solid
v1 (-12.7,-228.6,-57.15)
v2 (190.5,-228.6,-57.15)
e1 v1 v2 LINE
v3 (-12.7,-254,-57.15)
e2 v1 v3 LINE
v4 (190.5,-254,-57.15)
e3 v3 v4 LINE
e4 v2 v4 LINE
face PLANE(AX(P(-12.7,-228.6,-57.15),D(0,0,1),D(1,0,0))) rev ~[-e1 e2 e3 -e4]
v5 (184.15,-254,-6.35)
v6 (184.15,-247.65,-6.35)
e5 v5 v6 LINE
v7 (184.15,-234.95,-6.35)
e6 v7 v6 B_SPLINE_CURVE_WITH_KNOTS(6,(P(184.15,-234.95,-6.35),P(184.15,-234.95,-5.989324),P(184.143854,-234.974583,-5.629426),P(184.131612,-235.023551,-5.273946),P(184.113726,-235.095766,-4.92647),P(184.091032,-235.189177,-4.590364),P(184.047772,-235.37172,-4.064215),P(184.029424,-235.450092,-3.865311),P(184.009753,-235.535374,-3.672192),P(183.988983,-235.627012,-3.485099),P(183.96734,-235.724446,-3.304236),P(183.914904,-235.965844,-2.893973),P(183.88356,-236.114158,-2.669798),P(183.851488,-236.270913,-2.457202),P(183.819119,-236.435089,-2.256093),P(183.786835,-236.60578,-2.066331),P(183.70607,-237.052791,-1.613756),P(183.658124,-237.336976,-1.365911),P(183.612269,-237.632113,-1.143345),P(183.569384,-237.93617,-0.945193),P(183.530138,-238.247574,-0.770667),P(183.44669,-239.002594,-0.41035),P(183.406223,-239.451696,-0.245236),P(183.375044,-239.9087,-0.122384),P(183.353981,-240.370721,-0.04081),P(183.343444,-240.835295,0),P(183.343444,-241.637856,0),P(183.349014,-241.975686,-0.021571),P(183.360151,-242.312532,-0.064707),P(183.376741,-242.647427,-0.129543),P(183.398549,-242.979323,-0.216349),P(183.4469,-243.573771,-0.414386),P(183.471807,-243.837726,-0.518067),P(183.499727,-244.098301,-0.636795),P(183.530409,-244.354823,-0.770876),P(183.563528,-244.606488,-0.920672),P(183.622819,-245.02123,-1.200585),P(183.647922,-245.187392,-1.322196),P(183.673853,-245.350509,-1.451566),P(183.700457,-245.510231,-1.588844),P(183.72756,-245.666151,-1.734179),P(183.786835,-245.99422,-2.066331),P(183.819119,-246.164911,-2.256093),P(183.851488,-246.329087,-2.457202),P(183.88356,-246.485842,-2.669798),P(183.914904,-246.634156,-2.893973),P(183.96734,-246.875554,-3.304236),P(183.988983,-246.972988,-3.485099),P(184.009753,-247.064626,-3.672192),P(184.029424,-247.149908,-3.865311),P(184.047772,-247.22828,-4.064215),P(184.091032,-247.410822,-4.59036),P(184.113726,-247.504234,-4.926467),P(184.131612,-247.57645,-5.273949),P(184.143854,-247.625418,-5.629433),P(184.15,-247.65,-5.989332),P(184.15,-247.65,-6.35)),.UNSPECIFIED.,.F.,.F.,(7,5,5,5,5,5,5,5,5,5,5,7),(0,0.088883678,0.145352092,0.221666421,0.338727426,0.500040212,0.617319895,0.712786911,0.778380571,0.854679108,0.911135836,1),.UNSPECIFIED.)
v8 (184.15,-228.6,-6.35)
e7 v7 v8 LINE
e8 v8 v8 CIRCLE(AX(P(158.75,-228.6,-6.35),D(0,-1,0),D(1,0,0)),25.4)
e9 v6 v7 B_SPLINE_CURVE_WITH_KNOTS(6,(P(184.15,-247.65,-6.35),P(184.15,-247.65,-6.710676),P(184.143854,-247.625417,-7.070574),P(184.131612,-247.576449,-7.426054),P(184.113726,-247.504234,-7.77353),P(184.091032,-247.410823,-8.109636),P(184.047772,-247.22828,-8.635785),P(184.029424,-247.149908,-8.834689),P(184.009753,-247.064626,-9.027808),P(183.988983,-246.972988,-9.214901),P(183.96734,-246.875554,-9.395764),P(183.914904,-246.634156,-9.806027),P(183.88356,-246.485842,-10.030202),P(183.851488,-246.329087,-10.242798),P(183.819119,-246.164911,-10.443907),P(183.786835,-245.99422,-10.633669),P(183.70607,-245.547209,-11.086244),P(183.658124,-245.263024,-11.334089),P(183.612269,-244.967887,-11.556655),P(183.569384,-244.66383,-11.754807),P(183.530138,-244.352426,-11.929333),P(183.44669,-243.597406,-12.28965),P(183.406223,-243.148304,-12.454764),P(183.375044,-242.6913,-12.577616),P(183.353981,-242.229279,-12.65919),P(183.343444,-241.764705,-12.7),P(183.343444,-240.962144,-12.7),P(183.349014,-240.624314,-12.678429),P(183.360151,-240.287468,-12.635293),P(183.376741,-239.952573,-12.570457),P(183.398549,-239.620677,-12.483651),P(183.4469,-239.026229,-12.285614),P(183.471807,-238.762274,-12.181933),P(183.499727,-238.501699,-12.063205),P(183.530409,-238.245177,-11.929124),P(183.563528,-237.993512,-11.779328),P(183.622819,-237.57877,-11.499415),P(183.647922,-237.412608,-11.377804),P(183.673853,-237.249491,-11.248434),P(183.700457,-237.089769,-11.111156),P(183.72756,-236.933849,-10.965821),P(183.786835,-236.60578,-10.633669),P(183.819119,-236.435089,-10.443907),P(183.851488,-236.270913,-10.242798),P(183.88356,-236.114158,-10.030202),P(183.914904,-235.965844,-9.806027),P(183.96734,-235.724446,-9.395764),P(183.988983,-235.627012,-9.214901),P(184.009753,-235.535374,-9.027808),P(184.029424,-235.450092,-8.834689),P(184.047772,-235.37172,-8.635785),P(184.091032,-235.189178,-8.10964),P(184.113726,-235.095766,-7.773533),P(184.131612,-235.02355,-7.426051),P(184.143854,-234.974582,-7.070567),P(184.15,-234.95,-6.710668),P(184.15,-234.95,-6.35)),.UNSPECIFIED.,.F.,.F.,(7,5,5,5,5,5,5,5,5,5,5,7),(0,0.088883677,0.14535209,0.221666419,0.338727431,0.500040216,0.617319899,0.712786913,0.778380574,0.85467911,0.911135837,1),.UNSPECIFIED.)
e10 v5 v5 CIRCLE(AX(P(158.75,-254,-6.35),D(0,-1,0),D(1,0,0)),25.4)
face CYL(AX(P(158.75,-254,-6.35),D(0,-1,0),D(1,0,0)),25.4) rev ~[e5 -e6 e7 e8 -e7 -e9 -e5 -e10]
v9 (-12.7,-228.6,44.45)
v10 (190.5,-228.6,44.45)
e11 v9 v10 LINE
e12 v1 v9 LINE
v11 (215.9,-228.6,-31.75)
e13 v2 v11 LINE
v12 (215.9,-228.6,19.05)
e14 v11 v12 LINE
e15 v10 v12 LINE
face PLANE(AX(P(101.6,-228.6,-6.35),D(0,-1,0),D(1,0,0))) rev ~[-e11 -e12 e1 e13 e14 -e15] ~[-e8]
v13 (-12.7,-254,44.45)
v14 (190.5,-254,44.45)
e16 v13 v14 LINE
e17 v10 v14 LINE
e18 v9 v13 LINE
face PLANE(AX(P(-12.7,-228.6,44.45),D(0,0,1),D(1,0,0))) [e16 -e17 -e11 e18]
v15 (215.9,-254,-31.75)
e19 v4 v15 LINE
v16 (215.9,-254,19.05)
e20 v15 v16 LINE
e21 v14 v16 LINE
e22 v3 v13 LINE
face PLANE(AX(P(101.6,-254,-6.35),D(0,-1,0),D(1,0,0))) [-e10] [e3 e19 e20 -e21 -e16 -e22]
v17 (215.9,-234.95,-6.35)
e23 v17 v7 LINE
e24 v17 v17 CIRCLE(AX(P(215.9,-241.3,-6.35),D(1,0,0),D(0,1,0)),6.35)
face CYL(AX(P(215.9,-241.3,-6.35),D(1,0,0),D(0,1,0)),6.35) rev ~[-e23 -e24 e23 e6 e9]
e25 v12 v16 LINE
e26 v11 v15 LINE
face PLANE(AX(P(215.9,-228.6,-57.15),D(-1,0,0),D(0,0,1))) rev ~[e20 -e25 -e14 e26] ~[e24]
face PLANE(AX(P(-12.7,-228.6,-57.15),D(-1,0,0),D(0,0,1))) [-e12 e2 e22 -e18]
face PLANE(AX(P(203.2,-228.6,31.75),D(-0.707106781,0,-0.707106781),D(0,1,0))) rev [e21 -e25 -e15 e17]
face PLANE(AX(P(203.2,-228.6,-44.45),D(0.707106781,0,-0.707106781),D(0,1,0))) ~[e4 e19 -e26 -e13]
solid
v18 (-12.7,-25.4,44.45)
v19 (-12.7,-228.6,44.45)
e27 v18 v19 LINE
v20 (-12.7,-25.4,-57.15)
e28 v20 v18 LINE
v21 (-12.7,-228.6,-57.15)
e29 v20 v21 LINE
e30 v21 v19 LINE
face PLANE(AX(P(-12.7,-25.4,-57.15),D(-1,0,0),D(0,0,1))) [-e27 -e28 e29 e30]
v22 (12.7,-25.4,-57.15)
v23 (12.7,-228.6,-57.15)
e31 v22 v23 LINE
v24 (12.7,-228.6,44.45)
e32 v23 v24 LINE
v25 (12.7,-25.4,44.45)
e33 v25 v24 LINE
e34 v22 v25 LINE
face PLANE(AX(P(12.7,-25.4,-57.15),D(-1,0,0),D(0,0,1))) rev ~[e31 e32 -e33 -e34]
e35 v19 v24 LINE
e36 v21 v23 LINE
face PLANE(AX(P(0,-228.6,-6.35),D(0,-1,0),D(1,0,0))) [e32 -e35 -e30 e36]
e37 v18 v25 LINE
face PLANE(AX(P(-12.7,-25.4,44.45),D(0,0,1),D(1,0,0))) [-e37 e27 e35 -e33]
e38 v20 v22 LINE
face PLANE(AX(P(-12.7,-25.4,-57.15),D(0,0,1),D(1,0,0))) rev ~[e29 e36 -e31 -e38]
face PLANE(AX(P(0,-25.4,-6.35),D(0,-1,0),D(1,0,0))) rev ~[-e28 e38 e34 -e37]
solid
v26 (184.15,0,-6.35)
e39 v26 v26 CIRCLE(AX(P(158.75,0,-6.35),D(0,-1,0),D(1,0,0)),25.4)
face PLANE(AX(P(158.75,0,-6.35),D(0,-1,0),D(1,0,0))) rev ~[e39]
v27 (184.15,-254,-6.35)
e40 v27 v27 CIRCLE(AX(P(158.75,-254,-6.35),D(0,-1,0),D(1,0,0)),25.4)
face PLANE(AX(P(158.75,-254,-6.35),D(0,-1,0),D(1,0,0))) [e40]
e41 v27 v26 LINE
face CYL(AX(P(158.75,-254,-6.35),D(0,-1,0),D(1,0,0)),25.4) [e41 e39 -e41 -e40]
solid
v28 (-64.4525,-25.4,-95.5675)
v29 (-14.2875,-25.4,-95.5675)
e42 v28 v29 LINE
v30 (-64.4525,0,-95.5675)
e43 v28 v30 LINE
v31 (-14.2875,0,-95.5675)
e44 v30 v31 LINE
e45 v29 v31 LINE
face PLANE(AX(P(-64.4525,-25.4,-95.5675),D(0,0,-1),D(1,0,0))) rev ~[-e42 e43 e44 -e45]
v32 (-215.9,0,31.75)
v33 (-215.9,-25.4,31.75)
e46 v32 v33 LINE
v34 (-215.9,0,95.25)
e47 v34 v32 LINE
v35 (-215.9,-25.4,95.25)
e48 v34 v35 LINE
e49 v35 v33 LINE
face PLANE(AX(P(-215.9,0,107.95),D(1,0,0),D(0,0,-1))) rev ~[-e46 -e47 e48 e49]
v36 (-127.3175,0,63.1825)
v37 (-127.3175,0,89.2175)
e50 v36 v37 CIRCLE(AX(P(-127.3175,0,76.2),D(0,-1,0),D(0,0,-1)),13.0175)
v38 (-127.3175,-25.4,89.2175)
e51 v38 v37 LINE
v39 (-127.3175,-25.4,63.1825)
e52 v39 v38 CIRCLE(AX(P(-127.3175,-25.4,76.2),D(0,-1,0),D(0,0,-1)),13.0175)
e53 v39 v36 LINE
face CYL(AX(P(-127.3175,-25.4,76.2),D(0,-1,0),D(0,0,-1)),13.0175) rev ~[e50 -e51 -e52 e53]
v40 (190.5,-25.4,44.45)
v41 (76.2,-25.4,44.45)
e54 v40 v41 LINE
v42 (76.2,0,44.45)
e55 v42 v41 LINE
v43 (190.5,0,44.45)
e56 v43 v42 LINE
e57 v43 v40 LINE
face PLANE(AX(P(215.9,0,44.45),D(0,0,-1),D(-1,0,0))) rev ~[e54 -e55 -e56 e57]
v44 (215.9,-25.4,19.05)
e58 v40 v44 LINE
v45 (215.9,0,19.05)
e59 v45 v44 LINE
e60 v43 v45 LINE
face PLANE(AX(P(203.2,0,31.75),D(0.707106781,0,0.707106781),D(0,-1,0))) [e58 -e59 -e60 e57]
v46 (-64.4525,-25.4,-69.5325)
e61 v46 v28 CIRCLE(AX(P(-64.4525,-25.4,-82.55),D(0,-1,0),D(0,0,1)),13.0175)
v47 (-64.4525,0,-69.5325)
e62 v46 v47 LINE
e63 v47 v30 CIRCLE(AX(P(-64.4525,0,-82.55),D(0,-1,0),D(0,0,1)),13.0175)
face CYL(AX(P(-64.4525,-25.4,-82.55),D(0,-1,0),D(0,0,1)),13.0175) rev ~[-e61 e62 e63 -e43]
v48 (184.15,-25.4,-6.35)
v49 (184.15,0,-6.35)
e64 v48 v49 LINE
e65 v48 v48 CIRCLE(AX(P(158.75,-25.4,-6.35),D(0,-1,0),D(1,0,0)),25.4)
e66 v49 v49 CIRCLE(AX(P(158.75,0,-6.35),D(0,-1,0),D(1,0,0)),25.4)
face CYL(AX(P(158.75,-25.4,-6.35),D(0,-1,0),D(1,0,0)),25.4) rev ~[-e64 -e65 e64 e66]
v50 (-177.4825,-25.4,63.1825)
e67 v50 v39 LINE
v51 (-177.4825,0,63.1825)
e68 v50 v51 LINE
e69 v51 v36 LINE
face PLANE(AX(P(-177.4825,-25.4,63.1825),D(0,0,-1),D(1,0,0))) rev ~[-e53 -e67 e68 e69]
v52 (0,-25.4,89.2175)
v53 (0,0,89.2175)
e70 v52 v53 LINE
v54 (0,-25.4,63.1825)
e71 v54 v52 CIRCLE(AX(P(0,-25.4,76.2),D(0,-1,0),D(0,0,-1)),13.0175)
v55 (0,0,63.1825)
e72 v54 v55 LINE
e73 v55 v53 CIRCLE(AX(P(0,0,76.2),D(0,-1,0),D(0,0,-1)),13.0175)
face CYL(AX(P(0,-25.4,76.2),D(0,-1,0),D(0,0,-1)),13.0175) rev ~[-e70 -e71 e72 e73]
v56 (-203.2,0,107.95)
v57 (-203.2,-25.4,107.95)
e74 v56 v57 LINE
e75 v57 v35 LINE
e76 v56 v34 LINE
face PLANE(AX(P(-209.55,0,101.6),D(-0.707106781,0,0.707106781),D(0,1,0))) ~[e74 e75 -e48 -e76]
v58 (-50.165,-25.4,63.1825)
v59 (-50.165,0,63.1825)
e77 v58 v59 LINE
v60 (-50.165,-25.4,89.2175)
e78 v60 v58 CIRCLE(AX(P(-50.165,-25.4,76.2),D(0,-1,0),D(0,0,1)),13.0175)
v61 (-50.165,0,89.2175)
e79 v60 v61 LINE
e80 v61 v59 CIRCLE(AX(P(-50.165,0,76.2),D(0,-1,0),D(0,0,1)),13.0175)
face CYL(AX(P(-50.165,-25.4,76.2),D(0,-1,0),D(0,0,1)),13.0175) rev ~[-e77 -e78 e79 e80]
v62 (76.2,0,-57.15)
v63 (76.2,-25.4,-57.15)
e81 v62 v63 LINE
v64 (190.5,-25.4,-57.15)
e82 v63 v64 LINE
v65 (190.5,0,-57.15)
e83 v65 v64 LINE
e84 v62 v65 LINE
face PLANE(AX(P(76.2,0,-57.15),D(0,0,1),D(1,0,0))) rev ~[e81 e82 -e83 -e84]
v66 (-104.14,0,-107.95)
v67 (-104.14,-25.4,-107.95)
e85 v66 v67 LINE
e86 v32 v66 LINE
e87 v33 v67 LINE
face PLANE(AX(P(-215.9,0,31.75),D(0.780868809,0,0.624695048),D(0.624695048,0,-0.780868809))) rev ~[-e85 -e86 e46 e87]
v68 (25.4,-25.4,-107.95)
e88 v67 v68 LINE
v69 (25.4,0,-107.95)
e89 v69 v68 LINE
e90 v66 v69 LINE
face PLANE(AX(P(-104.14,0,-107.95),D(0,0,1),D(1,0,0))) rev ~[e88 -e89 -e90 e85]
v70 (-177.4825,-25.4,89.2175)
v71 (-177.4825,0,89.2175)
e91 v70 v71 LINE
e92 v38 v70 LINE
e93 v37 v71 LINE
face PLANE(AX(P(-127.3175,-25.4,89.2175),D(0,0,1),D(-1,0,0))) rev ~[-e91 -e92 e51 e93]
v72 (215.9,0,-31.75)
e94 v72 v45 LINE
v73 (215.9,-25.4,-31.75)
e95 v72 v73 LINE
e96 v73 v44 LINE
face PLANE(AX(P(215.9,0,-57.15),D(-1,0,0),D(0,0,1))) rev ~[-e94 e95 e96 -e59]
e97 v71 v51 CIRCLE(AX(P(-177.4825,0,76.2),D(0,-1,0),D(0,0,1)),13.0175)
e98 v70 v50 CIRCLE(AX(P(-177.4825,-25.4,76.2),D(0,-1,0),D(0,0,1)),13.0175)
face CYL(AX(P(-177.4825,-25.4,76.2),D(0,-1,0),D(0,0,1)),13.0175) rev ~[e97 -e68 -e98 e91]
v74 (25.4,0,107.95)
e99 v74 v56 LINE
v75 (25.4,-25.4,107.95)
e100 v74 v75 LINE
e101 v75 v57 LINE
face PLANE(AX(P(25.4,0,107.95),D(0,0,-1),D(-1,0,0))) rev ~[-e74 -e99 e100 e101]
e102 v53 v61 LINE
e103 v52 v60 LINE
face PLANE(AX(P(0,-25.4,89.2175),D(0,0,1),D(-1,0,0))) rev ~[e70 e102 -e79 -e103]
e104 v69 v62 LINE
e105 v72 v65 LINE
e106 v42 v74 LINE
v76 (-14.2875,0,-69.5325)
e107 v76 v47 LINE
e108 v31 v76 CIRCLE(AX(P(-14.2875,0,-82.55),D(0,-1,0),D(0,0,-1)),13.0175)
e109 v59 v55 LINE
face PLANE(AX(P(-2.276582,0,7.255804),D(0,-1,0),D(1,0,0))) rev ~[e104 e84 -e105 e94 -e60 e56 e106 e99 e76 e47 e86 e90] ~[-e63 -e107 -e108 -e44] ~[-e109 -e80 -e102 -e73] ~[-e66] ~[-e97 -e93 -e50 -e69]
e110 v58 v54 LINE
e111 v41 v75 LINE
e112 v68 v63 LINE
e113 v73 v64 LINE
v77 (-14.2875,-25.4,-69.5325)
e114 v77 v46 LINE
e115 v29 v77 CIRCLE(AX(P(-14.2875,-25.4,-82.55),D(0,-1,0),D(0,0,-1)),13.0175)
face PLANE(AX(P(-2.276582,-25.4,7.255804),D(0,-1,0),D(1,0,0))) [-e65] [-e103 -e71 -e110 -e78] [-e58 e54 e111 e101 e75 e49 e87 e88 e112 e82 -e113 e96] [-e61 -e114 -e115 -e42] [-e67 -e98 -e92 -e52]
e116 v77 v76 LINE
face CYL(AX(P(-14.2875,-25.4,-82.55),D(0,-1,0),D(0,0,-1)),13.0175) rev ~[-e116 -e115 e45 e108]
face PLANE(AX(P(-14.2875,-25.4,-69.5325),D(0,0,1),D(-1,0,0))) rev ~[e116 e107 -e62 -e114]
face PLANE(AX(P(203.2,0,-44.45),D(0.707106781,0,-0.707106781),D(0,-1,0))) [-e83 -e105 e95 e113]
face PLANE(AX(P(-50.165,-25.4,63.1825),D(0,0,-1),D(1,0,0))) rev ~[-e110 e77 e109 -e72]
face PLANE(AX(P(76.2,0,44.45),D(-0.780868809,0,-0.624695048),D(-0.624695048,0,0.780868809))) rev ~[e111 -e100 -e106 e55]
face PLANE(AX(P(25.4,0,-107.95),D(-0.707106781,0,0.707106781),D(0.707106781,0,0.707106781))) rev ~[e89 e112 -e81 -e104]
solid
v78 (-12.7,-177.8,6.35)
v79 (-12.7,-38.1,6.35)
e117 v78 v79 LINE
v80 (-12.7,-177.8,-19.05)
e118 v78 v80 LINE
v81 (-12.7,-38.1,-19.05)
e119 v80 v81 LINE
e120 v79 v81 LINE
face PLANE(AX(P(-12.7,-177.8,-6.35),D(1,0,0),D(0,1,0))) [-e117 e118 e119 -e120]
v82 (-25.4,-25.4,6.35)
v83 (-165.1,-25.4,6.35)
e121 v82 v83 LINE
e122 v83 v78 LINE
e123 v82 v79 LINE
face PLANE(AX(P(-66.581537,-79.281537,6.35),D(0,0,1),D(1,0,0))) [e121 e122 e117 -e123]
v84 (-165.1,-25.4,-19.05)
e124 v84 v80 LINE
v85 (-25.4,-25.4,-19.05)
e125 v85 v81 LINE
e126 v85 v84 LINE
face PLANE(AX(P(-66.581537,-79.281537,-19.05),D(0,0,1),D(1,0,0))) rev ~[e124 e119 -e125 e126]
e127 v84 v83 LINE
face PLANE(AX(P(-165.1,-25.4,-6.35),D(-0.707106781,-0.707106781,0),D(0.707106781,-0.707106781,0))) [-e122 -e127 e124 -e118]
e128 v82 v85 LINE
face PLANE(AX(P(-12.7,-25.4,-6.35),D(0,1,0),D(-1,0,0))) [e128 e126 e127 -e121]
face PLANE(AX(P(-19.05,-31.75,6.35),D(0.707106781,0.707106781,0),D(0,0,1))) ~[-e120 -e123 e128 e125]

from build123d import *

# Parameters (mm, degrees)
F1_DEPTH   = 25.4
F2_R       = 25.4
F3_DEPTH   = 25.4
F4_W       = 25.4
F4_H       = 101.6
F5_DEPTH   = 203.2
F6_W       = 228.6
F6_H       = 101.6
F7_DEPTH   = 25.4
F8_R       = 25.4
F9_DEPTH   = 25.4
F12_DEPTH  = 12.7
F13_SIZE   = 12.7
F14_SIZE   = 25.4
F14_2_SIZE = 25.4
F15_SIZE   = 12.7
F16_DEPTH  = 254
F17_R      = 6.35
F18_DEPTH  = 32.5575558516
F20_DEPTH  = 25.4


with BuildPart() as f1:
    # F0 (on Front) → F1 (new body)
    with BuildSketch(Plane.XZ):
        Polygon((25.4, 107.95), (-215.9, 107.95), (-215.9, 31.75), (-104.14, -107.95), (25.4, -107.95), (76.2, -57.15), (215.9, -57.15), (215.9, 44.45), (76.2, 44.45), align=None)
    extrude(amount=F1_DEPTH)

    # F2 (on face) → F3 (cut)
    with BuildSketch(Plane.XZ.offset(25.4)):
        with Locations((158.75, -6.35)):
            Circle(F2_R)
    extrude(amount=-F3_DEPTH, mode=Mode.SUBTRACT)

    # F14
    f14_edges = [f1.edges().sort_by_distance(p)[0] for p in [
        (215.9, -12.7, -57.15),
        (215.9, -12.7, 44.45),
    ]]
    chamfer(f14_edges, length=F14_SIZE)

    # F15
    f15_edges = [f1.edges().sort_by_distance(p)[0] for p in [
        (-215.9, -12.7, 107.95),
    ]]
    chamfer(f15_edges, length=F15_SIZE)

    # F19 (on face) → F20 (cut)
    with BuildSketch(Plane.XZ.offset(25.4)):
        with BuildLine():
            Line((-127.3175, 89.2175), (-177.4825, 89.2175))
            ThreePointArc((-177.4825, 89.2175), (-190.5, 76.2), (-177.4825, 63.1825))
            Line((-177.4825, 63.1825), (-127.3175, 63.1825))
            ThreePointArc((-127.3175, 63.1825), (-114.3, 76.2), (-127.3175, 89.2175))
        make_face()
        with BuildLine():
            Line((0, 89.2175), (-50.165, 89.2175))
            ThreePointArc((-50.165, 89.2175), (-63.1825, 76.2), (-50.165, 63.1825))
            Line((-50.165, 63.1825), (0, 63.1825))
            ThreePointArc((0, 63.1825), (13.0175, 76.2), (0, 89.2175))
        make_face()
        with BuildLine():
            Line((-14.2875, -69.5325), (-64.4525, -69.5325))
            ThreePointArc((-64.4525, -69.5325), (-77.47, -82.55), (-64.4525, -95.5675))
            Line((-64.4525, -95.5675), (-14.2875, -95.5675))
            ThreePointArc((-14.2875, -95.5675), (-1.27, -82.55), (-14.2875, -69.5325))
        make_face()
    extrude(amount=-F20_DEPTH, mode=Mode.SUBTRACT)


with BuildPart() as f5:
    # F4 (on face) → F5 (new body)
    with BuildSketch(Plane.XZ.offset(25.4)):
        with Locations((0, -6.35)):
            Rectangle(F4_W, F4_H)
    extrude(amount=F5_DEPTH)


with BuildPart() as f7:
    # F6 (on face) → F7 (new body)
    with BuildSketch(Plane.XZ.offset(228.6)):
        with Locations((101.6, -6.35)):
            Rectangle(F6_W, F6_H)
    extrude(amount=F7_DEPTH)

    # F8 (on face) → F9 (cut)
    with BuildSketch(Plane.XZ.offset(254)):
        with Locations((158.75, -6.35)):
            Circle(F8_R)
    extrude(amount=-F9_DEPTH, mode=Mode.SUBTRACT)

    # F14#2
    f14_2_edges = [f7.edges().sort_by_distance(p)[0] for p in [
        (215.9, -241.3, 44.45),
        (215.9, -241.3, -57.15),
    ]]
    chamfer(f14_2_edges, length=F14_2_SIZE)

    # F17 (on face) → F18 (cut, through all)
    with BuildSketch(Plane.YZ.offset(215.9)):
        with Locations((-241.3, -6.35)):
            Circle(F17_R)
    extrude(amount=-F18_DEPTH, mode=Mode.SUBTRACT)


with BuildPart() as f12:
    # F11 (on mid) → F12 (new body, symmetric)
    with BuildSketch(Plane.XY.offset(-6.35)):
        Polygon((-12.7, -25.4), (-165.1, -25.4), (-12.7, -177.8), align=None)
    extrude(amount=F12_DEPTH, both=True)

    # F13
    f13_edges = [f12.edges().sort_by_distance(p)[0] for p in [
        (-12.7, -25.4, -6.35),
    ]]
    chamfer(f13_edges, length=F13_SIZE)


with BuildPart() as f16:
    # F8 (on face) → F16 (new body, through all)
    with BuildSketch(Plane.XZ.offset(254)):
        with Locations((158.75, -6.35)):
            Circle(F8_R)
    extrude(amount=-F16_DEPTH)


solid = Compound([f1.part, f5.part, f7.part, f12.part, f16.part])
